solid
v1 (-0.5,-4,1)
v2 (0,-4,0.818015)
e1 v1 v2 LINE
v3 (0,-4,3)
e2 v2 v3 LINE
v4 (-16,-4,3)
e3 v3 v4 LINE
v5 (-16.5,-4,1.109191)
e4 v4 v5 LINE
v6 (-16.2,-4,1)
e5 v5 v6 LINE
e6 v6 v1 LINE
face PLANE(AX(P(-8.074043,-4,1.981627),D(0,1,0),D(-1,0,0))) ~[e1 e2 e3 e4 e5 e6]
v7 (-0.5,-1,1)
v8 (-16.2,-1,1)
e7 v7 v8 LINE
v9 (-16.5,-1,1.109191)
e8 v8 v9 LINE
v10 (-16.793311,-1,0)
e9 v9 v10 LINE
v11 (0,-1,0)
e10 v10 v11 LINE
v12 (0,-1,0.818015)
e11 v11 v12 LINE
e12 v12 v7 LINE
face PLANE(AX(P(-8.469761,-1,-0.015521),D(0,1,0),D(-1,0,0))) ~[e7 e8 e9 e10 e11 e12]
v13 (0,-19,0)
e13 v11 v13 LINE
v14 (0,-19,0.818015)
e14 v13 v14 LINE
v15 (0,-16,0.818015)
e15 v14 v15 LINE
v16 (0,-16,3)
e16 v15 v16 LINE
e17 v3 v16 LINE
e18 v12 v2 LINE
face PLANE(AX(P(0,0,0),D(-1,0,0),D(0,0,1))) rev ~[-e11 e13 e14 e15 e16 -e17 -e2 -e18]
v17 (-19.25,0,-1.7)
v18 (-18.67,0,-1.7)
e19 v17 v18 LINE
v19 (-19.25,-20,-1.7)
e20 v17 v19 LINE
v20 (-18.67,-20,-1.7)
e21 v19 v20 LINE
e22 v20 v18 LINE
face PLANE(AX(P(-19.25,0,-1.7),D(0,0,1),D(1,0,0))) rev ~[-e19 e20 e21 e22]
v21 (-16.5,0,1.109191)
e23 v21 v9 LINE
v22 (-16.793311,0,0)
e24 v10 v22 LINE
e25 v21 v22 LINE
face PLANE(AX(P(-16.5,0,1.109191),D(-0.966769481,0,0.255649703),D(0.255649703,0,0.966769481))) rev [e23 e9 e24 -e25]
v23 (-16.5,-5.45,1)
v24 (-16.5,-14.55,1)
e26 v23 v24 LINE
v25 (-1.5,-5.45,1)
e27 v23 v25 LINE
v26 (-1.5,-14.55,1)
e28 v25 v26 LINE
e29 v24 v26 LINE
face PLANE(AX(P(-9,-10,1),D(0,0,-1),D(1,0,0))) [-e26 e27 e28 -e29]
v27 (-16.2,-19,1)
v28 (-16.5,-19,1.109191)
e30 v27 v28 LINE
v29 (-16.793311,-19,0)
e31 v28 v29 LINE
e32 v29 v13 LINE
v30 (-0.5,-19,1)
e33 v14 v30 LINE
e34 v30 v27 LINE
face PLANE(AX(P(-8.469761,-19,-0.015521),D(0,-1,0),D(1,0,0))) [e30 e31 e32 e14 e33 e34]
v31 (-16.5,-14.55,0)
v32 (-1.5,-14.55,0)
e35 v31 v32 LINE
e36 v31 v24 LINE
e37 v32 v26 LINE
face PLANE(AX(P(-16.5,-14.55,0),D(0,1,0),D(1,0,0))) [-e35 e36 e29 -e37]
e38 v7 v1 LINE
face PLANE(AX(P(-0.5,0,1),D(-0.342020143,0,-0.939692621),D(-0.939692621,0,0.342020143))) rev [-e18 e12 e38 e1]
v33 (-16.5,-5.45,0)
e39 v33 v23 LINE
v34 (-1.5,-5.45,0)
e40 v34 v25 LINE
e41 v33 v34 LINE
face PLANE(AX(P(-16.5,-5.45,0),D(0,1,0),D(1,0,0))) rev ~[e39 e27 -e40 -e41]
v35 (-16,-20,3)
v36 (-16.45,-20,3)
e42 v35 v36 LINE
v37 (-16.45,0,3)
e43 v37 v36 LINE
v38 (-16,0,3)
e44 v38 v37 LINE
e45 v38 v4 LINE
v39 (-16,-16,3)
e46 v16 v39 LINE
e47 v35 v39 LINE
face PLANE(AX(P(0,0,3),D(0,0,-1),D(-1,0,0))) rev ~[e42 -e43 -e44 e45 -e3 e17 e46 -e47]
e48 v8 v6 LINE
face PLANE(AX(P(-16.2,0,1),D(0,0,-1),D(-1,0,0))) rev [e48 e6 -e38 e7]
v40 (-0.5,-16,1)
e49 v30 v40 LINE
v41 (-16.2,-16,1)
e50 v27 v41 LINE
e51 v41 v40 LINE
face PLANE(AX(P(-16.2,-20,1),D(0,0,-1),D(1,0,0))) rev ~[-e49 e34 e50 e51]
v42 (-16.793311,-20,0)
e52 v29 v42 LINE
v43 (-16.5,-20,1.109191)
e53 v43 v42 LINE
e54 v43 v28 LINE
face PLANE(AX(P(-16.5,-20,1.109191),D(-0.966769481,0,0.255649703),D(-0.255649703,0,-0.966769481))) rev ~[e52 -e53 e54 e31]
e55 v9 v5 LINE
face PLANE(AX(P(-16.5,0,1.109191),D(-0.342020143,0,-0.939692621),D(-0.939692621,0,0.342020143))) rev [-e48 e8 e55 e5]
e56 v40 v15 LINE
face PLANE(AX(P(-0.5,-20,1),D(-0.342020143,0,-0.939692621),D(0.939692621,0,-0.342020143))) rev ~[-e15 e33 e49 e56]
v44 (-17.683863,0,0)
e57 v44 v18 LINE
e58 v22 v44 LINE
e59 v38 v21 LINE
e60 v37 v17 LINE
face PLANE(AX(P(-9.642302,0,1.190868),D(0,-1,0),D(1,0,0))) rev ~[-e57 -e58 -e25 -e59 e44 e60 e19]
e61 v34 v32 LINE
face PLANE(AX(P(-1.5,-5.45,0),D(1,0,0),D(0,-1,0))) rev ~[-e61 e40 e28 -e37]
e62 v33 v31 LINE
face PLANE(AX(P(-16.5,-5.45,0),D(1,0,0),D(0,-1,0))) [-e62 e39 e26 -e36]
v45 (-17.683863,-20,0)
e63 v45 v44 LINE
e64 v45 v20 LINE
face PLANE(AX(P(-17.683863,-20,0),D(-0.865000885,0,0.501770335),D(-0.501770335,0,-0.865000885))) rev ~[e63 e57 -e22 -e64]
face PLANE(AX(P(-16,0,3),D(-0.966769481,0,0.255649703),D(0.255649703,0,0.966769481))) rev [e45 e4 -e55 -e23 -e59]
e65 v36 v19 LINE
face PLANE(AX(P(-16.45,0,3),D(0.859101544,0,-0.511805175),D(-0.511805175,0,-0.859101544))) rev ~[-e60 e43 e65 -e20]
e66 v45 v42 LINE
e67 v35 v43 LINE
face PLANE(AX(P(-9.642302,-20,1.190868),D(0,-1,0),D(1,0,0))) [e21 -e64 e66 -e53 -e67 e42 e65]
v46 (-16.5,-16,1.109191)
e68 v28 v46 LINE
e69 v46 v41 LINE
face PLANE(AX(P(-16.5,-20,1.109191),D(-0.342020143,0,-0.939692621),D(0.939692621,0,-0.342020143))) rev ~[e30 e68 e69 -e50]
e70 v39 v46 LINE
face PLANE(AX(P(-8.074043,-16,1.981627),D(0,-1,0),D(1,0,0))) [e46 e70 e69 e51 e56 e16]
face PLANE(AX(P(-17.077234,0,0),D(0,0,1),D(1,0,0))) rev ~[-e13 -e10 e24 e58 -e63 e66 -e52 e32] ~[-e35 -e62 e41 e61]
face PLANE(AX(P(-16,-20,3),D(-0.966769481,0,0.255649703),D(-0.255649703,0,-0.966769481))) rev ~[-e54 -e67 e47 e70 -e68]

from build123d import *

# Parameters (mm, degrees)
F1_DEPTH  = 20
F3_DEPTH  = 4
F5_DEPTH  = 1
F7_DEPTH  = 20.001
F10_W     = 15
F10_H     = 9.1
F11_DEPTH = 1


# Not quite as in the source:
# - a pattern or mirror of a feature is missing from the dataset's text; its kind, count and spacing are read off the source's solid


with BuildPart() as f1:
    # F0 (on Front) → F1 (new body)
    with BuildSketch(Plane.XZ):
        Polygon((-16.45, 3), (-19.25, -1.7), (-18.09, -1.7), (-17.0772340426, 0), (0, 0), (0, 3), align=None)
    extrude(amount=F1_DEPTH)

    # F2 (on face) → F3 (cut)
    with BuildSketch(Plane.XZ.offset(20)):
        Polygon((-16.2, 1), (-0.5, 1), (0, 0.8180148829), (0, 3), (-16, 3), (-16.5, 1.1091910703), align=None)
    f3 = extrude(amount=-F3_DEPTH, mode=Mode.SUBTRACT)

    # F3_copies: F3 across plane
    add(f3.mirror(Plane.ZX.offset(-10)), mode=Mode.SUBTRACT)

    # F4 (on face) → F5 (cut)
    with BuildSketch(Plane.XZ.offset(20)):
        Polygon((0, -1), (0, 0.8180148829), (-0.5, 1), (-16.2, 1), (-16.5, 1.1091910703), (-17.0577483365, -1), align=None)
    f5 = extrude(amount=-F5_DEPTH, mode=Mode.SUBTRACT)

    # F5_copies: F5 across plane
    add(f5.mirror(Plane.ZX.offset(-10)), mode=Mode.SUBTRACT)

    # F6 (on face) → F7 (cut, through all)
    with BuildSketch(Plane.XZ.offset(20)):
        Polygon((-18.67, -1.7), (-18.09, -1.7), (-17.0772340426, 0), (-17.683862779, 0), align=None)
    extrude(amount=-F7_DEPTH, mode=Mode.SUBTRACT)

    # F10 (on face) → F11 (cut)
    with BuildSketch(Plane(origin=(0, 0, 0), x_dir=(1, 0, 0), z_dir=(0, 0, -1))):
        with Locations((-9, 10)):
            Rectangle(F10_W, F10_H)
    extrude(amount=-F11_DEPTH, mode=Mode.SUBTRACT)


solid = f1.part
